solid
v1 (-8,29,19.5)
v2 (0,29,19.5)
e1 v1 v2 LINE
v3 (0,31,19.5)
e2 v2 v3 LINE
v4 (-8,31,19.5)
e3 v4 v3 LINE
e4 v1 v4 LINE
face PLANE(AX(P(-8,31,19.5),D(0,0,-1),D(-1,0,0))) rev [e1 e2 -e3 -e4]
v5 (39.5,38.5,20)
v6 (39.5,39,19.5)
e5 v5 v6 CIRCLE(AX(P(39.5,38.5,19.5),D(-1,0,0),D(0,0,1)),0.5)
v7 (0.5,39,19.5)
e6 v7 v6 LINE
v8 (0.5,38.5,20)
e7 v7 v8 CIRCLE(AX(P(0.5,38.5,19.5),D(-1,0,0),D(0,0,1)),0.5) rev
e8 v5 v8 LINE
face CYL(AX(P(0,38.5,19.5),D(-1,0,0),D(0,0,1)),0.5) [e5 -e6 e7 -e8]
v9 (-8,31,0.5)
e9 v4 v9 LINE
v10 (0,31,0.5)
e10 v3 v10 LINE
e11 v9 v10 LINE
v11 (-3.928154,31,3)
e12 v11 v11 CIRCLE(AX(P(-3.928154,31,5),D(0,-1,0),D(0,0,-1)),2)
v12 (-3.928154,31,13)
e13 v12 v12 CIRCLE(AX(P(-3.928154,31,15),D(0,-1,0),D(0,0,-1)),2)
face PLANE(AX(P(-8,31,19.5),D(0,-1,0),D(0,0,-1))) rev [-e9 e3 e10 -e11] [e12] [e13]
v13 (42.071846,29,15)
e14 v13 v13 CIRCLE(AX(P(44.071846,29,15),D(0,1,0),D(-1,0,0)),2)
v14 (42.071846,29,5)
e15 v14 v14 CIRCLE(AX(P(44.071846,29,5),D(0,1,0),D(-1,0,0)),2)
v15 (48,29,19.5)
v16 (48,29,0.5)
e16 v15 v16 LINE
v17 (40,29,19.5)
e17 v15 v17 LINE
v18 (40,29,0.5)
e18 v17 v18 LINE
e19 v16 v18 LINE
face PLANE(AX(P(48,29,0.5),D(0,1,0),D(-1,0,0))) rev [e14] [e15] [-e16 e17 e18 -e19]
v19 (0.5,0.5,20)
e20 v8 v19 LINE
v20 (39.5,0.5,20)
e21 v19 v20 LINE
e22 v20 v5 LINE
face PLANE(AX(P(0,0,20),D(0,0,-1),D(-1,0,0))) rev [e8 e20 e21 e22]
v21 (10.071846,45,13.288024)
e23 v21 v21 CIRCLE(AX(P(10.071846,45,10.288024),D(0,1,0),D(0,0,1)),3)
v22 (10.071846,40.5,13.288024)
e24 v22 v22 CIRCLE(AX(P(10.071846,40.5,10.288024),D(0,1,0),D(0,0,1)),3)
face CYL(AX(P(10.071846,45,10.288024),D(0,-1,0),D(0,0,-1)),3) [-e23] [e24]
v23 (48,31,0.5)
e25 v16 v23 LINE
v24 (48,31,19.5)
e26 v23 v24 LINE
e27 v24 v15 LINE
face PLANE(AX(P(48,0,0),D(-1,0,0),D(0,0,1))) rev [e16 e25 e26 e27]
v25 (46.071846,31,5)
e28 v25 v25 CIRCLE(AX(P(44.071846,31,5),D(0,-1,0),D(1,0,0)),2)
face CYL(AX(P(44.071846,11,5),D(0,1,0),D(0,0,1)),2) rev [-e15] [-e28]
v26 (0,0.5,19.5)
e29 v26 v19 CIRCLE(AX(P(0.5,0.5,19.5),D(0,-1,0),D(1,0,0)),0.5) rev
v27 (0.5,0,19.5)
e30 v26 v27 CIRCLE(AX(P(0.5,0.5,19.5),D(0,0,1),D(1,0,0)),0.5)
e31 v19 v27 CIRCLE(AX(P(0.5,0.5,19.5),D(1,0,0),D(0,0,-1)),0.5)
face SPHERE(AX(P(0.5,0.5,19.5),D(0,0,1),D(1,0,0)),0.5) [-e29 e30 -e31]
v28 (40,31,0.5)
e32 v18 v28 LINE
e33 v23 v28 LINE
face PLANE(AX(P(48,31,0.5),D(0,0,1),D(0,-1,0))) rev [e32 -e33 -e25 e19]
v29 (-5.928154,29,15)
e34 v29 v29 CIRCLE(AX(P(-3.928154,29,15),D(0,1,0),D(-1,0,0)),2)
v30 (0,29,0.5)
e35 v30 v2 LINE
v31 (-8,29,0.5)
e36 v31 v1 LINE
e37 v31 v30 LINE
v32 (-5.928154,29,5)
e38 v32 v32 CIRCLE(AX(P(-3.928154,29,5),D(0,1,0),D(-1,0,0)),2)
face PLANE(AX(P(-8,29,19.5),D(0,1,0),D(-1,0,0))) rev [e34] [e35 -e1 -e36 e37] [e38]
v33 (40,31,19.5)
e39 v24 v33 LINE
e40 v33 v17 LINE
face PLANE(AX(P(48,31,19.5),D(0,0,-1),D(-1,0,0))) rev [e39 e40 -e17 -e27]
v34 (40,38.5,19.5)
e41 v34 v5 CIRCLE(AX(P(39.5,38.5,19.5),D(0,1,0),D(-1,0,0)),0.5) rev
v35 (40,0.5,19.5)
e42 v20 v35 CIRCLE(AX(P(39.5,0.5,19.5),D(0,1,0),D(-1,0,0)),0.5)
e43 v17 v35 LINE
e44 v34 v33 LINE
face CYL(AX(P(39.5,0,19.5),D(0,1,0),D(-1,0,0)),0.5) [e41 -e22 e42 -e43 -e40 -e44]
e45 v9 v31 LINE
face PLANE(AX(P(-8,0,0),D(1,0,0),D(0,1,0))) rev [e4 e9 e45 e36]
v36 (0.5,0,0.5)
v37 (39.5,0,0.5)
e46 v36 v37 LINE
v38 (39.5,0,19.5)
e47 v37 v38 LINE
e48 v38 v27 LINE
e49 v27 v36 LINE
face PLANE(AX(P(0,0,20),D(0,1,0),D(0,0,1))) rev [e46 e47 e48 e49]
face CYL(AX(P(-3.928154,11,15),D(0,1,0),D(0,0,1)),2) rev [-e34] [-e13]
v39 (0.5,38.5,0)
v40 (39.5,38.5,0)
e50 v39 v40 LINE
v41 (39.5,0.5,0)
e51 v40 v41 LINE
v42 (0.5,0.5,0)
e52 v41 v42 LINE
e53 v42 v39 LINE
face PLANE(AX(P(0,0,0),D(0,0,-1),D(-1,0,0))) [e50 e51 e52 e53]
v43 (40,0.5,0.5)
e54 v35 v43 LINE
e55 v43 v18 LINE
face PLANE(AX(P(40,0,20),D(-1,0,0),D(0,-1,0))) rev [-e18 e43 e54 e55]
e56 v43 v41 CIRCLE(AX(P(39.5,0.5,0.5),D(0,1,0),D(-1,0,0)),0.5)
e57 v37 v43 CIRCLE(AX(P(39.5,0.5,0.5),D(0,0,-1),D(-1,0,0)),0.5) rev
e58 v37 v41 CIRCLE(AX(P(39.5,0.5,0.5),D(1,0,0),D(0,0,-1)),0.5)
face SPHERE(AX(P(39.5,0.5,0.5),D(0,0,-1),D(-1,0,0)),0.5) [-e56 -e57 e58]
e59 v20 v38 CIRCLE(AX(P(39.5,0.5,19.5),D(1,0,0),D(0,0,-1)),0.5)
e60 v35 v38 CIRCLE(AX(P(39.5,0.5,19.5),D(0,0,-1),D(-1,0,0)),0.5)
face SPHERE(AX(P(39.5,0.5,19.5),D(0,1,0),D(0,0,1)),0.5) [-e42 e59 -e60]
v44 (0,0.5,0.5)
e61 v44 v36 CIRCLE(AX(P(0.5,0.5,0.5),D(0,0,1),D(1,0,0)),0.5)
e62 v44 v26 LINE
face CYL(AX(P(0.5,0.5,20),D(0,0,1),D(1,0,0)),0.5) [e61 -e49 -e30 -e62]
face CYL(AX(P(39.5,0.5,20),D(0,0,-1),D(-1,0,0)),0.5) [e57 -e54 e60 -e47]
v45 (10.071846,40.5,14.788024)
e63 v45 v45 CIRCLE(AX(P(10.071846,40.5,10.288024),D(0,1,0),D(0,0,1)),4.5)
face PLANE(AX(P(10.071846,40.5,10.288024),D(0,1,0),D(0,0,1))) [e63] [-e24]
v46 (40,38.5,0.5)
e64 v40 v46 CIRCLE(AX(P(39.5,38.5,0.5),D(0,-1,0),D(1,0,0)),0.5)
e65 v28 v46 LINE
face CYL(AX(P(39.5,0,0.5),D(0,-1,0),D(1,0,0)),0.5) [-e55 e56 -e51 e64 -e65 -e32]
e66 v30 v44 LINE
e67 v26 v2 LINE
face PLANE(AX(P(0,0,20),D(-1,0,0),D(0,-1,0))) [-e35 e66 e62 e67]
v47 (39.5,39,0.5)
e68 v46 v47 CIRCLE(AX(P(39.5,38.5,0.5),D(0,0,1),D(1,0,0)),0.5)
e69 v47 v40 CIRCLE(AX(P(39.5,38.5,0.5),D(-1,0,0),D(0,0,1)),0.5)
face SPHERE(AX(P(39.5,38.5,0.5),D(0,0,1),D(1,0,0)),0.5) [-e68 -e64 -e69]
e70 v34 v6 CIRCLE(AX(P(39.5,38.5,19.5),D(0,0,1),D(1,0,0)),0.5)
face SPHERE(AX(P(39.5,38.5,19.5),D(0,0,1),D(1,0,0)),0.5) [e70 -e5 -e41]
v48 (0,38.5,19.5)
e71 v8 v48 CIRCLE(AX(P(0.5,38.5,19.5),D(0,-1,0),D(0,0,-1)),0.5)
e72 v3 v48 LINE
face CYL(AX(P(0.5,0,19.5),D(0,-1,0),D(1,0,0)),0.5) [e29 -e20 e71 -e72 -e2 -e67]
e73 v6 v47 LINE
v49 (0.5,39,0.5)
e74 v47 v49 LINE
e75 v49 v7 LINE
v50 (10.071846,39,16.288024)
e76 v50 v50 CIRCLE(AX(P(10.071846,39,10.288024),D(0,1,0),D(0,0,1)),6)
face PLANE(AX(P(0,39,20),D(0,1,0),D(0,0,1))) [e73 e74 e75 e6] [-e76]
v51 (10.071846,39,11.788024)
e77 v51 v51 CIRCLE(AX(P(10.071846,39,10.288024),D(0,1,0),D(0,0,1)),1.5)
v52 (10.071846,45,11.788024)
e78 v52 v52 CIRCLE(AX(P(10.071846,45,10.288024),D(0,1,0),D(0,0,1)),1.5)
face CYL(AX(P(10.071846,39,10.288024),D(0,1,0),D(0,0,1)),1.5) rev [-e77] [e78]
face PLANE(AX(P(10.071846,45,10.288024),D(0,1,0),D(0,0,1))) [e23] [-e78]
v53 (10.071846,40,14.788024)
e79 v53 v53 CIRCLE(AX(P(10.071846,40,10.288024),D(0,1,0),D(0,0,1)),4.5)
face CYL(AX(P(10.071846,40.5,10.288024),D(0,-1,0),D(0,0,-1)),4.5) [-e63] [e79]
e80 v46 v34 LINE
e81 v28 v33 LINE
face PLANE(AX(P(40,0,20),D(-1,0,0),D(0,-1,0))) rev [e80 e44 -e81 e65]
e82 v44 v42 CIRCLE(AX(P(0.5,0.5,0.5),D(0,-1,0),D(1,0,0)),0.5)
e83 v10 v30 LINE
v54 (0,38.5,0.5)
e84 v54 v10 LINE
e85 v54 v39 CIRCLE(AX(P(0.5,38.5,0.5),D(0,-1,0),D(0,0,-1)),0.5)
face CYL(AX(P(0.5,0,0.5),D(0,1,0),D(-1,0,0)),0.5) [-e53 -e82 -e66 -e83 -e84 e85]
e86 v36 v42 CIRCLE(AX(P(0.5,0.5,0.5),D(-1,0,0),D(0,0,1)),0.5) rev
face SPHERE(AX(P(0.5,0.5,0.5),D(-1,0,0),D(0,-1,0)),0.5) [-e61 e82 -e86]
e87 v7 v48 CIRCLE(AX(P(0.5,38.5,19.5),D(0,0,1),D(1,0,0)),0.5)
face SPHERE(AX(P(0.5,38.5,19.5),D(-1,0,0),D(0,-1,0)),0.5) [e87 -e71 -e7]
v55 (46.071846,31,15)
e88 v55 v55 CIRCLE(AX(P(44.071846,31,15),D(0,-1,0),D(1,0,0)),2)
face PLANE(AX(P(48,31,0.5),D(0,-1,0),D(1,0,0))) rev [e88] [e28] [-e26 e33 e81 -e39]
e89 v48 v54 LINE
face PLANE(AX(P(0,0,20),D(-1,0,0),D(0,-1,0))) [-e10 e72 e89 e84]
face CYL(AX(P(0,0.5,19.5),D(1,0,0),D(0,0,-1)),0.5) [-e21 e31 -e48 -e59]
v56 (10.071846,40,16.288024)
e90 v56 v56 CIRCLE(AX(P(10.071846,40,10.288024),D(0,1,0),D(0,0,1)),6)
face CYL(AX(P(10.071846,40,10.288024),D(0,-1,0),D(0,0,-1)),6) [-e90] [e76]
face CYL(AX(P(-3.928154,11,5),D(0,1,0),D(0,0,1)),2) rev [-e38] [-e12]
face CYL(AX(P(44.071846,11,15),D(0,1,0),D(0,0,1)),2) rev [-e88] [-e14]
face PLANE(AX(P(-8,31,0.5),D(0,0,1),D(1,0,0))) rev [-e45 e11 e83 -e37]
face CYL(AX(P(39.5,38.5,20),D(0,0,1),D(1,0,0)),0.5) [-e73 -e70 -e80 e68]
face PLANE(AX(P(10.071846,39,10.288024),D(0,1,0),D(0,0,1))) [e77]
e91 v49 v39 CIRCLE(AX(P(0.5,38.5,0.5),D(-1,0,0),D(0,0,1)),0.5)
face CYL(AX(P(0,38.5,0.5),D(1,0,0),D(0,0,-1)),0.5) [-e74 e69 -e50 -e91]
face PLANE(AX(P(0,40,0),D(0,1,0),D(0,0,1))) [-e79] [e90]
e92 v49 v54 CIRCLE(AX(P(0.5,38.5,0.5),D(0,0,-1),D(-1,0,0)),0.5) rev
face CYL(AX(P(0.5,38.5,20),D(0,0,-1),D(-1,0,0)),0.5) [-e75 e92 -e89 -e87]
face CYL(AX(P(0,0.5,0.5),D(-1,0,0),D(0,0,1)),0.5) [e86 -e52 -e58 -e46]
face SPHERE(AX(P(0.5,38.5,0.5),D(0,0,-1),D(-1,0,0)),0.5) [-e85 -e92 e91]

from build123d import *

# Parameters (mm, degrees)
SKETCH_1_W          = 40
SKETCH_1_H          = 39
EXTRUDE_2_DEPTH     = 20
FILLET_2_R          = 0.5
FILLET_3_R          = 0.5
FILLET_4_R          = 0.5
FILLET_5_R          = 0.5
SKETCH_6_W          = 19
SKETCH_6_H          = 2
EXTRUDE_3_DEPTH     = 8
SKETCH_7_W          = 19
SKETCH_7_H          = 2
EXTRUDE_5_DEPTH     = 8
SKETCH_8_R          = 2
CUT_EXTRUDE_1_DEPTH = 28
SKETCH_9_R          = 6
SKETCH_9_R_2        = 4.5
EXTRUDE_7_DEPTH     = 1
SKETCH_10_R         = 4.5
EXTRUDE_8_DEPTH     = 1.5
SKETCH_11_R         = 3
EXTRUDE_9_DEPTH     = 4.5
SKETCH_12_R         = 1.5
CUT_EXTRUDE_2_DEPTH = 6


with BuildPart() as part:
    # 草图1 → 凸台-拉伸2 (new body)
    with BuildSketch(Plane.XY):
        with Locations((20, 19.5)):
            Rectangle(SKETCH_1_W, SKETCH_1_H)
    extrude(amount=EXTRUDE_2_DEPTH)

    # 圆角2
    fillet_2_edges = [part.edges().sort_by_distance(p)[0] for p in [
        (40, 19.5, 20),
        (20, 39, 20),
    ]]
    fillet(fillet_2_edges, radius=FILLET_2_R)

    # 圆角3
    fillet_3_edges = [part.edges().sort_by_distance(p)[0] for p in [
        (40, 0, 9.75),
        (19.75, 0, 20),
        (39.853553391, 0, 19.853553391),
        (0, 39, 9.75),
        (0, 38.853553391, 19.853553391),
        (0, 19.25, 20),
    ]]
    fillet(fillet_3_edges, radius=FILLET_3_R)

    # 圆角4
    # the kernel refuses this fillet: 0.5 mm, written as the material it takes off along each edge
    with BuildSketch(Plane(origin=(39.5, 38.5, 19.5), x_dir=(0, 1, 0), z_dir=(1, 0, 0))) as fillet_4_piece_1_section:
        Polygon((0, 0), (FILLET_4_R, 0), (FILLET_4_R, FILLET_4_R), (0, FILLET_4_R), align=None)
    fillet_4_piece_1 = extrude(amount=FILLET_4_R, mode=Mode.PRIVATE)
    fillet_4_piece_1 = fillet_4_piece_1 - Plane(origin=(39.5, 38.5, 19.5), x_dir=(0, -0.7071067811865475, -0.7071067811865475), z_dir=(1, 0, 0)) * Sphere(FILLET_4_R, mode=Mode.PRIVATE)
    add(fillet_4_piece_1, mode=Mode.SUBTRACT)
    with BuildSketch(Plane(origin=(40, 39, -1.25), x_dir=(0, -1, 0), z_dir=(0, 0, 1))) as fillet_4_piece_2:
        with BuildLine():
            CenterArc((FILLET_4_R, -FILLET_4_R), FILLET_4_R, 90, 90)
            Line((0, -FILLET_4_R), (0, 0))
            Line((0, 0), (FILLET_4_R, 0))
        make_face()
    extrude(amount=20.75, mode=Mode.SUBTRACT)
    with BuildSketch(Plane(origin=(40, 0.5, 0), x_dir=(-1, 0, 0), z_dir=(0, 1, 0))) as fillet_4_piece_3:
        with BuildLine():
            CenterArc((FILLET_4_R, FILLET_4_R), FILLET_4_R, 180, 90)
            Line((0, FILLET_4_R), (0, 0))
            Line((0, 0), (FILLET_4_R, 0))
        make_face()
    extrude(amount=39.75, mode=Mode.SUBTRACT)
    with BuildSketch(Plane(origin=(39.5, 0.5, 0), x_dir=(0, -1, 0), z_dir=(-1, 0, 0))) as fillet_4_piece_4:
        with BuildLine():
            CenterArc((0.5 - FILLET_4_R, FILLET_4_R), FILLET_4_R, 270, 90)
            Line((0.5, FILLET_4_R), (0.5, 0))
            Line((0.5, 0), (0.5 - FILLET_4_R, 0))
        make_face()
    revolve(axis=Axis((39.5, 0.5, 0), (0, 0, 1)), revolution_arc=90, mode=Mode.SUBTRACT)
    with BuildSketch(Plane(origin=(-1.25, 0, 0), x_dir=(0, 0, 1), z_dir=(1, 0, 0))) as fillet_4_piece_5:
        with BuildLine():
            CenterArc((FILLET_4_R, -FILLET_4_R), FILLET_4_R, 90, 90)
            Line((0, -FILLET_4_R), (0, 0))
            Line((0, 0), (FILLET_4_R, 0))
        make_face()
    extrude(amount=40.75, mode=Mode.SUBTRACT)

    # 圆角5
    # the kernel refuses this fillet: 0.5 mm, written as the material it takes off along each edge
    with BuildSketch(Plane(origin=(0.5, 0.5, 19.5), x_dir=(-1, 0, 0), z_dir=(0, -1, 0))) as fillet_5_piece_1_section:
        Polygon((0, 0), (FILLET_5_R, 0), (FILLET_5_R, -FILLET_5_R), (0, -FILLET_5_R), align=None)
    fillet_5_piece_1 = extrude(amount=FILLET_5_R, mode=Mode.PRIVATE)
    fillet_5_piece_1 = fillet_5_piece_1 - Plane(origin=(0.5, 0.5, 19.5), x_dir=(0.7071067811865475, 0, -0.7071067811865475), z_dir=(0, -1, 0)) * Sphere(FILLET_5_R, mode=Mode.PRIVATE)
    add(fillet_5_piece_1, mode=Mode.SUBTRACT)
    with BuildSketch(Plane(origin=(39.5, 38.5, 0.5), x_dir=(0, 1, 0), z_dir=(0, 0, -1))) as fillet_5_piece_2_section:
        Polygon((0, 0), (FILLET_5_R, 0), (FILLET_5_R, FILLET_5_R), (0, FILLET_5_R), align=None)
    fillet_5_piece_2 = extrude(amount=FILLET_5_R, mode=Mode.PRIVATE)
    fillet_5_piece_2 = fillet_5_piece_2 - Plane(origin=(39.5, 38.5, 0.5), x_dir=(-0.7071067811865475, -0.7071067811865477, 0), z_dir=(0, 0, -1)) * Sphere(FILLET_5_R, mode=Mode.PRIVATE)
    add(fillet_5_piece_2, mode=Mode.SUBTRACT)
    with BuildSketch(Plane(origin=(39.5, 39, 0), x_dir=(0, -1, 0), z_dir=(-1, 0, 0))) as fillet_5_piece_3:
        with BuildLine():
            CenterArc((FILLET_5_R, FILLET_5_R), FILLET_5_R, 180, 90)
            Line((0, FILLET_5_R), (0, 0))
            Line((0, 0), (FILLET_5_R, 0))
        make_face()
    extrude(amount=39, mode=Mode.SUBTRACT)
    with BuildSketch(Plane(origin=(0.5, 38.5, 0), x_dir=(-1, 0, 0), z_dir=(0, -1, 0))) as fillet_5_piece_4:
        with BuildLine():
            CenterArc((0.5 - FILLET_5_R, -FILLET_5_R), FILLET_5_R, 0, 90)
            Line((0.5, -FILLET_5_R), (0.5, 0))
            Line((0.5, 0), (0.5 - FILLET_5_R, 0))
        make_face()
    revolve(axis=Axis((0.5, 38.5, 0), (0, 0, -1)), revolution_arc=90, mode=Mode.SUBTRACT)
    with BuildSketch(Plane(origin=(0, 0, 0.5), x_dir=(1, 0, 0), z_dir=(0, 0, 1))) as fillet_5_piece_5:
        with BuildLine():
            CenterArc((FILLET_5_R, FILLET_5_R), FILLET_5_R, 180, 90)
            Line((0, FILLET_5_R), (0, 0))
            Line((0, 0), (FILLET_5_R, 0))
        make_face()
    extrude(amount=19, mode=Mode.SUBTRACT)
    with BuildSketch(Plane(origin=(0, 38.5, 0), x_dir=(0, 0, 1), z_dir=(0, -1, 0))) as fillet_5_piece_6:
        with BuildLine():
            CenterArc((FILLET_5_R, -FILLET_5_R), FILLET_5_R, 90, 90)
            Line((0, -FILLET_5_R), (0, 0))
            Line((0, 0), (FILLET_5_R, 0))
        make_face()
    extrude(amount=38, mode=Mode.SUBTRACT)
    with BuildSketch(Plane(origin=(0, 0.5, 0.5), x_dir=(0, 0, -1), z_dir=(0, 1, 0))) as fillet_5_piece_7:
        with BuildLine():
            CenterArc((0.5 - FILLET_5_R, -FILLET_5_R), FILLET_5_R, 0, 90)
            Line((0.5 - FILLET_5_R, 0), (0.5, 0))
            Line((0.5, 0), (0.5, -FILLET_5_R))
        make_face()
    revolve(axis=Axis((0, 0.5, 0.5), (-1, 0, 0)), revolution_arc=90, mode=Mode.SUBTRACT)

    # 草图6 → 凸台-拉伸3 (add)
    with BuildSketch(Plane.ZY):
        with Locations((10, 30)):
            Rectangle(SKETCH_6_W, SKETCH_6_H)
    extrude(amount=EXTRUDE_3_DEPTH)

    # 草图7 → 凸台-拉伸5 (add)
    with BuildSketch(Plane(origin=(40, 0, 0), x_dir=(0, 0, -1), z_dir=(1, 0, 0))):
        with Locations((-10, 30)):
            Rectangle(SKETCH_7_W, SKETCH_7_H)
    extrude(amount=EXTRUDE_5_DEPTH)

    # 草图8 → 切除-拉伸1 (cut)
    with BuildSketch(Plane(origin=(0, 39, 0), x_dir=(1, 0, 0), z_dir=(0, 1, 0))):
        with Locations(Location((-3.928154272, -5, 0), (0, 0, 180))):
            Circle(SKETCH_8_R)
        with Locations(Location((-3.928154272, -15, 0), (0, 0, 180))):
            Circle(SKETCH_8_R)
        with Locations(Location((44.071845728, -5, 0), (0, 0, 180))):
            Circle(SKETCH_8_R)
        with Locations(Location((44.071845728, -15, 0), (0, 0, 180))):
            Circle(SKETCH_8_R)
    extrude(amount=-CUT_EXTRUDE_1_DEPTH, mode=Mode.SUBTRACT)

    # 草图9 → 凸台-拉伸7 (add)
    with BuildSketch(Plane(origin=(0, 39, 0), x_dir=(1, 0, 0), z_dir=(0, 1, 0))):
        with Locations(Location((10.071845728, -10.288024079, 0), (0, 0, 270))):
            Circle(SKETCH_9_R)
        with Locations(Location((10.071845728, -10.288024079, 0), (0, 0, 270))):
            Circle(SKETCH_9_R_2, mode=Mode.SUBTRACT)
    extrude(amount=EXTRUDE_7_DEPTH)

    # 草图10 → 凸台-拉伸8 (add)
    with BuildSketch(Plane(origin=(0, 39, 0), x_dir=(1, 0, 0), z_dir=(0, 1, 0))):
        with Locations(Location((10.071845728, -10.288024079, 0), (0, 0, 270))):
            Circle(SKETCH_10_R)
    extrude(amount=EXTRUDE_8_DEPTH)

    # 草图11 → 凸台-拉伸9 (add)
    with BuildSketch(Plane(origin=(0, 40.5, 0), x_dir=(1, 0, 0), z_dir=(0, 1, 0))):
        with Locations(Location((10.071845728, -10.288024079, 0), (0, 0, 270))):
            Circle(SKETCH_11_R)
    extrude(amount=EXTRUDE_9_DEPTH)

    # 草图12 → 切除-拉伸2 (cut)
    with BuildSketch(Plane(origin=(0, 45, 0), x_dir=(1, 0, 0), z_dir=(0, 1, 0))):
        with Locations(Location((10.071845728, -10.288024079, 0), (0, 0, 270))):
            Circle(SKETCH_12_R)
    extrude(amount=-CUT_EXTRUDE_2_DEPTH, mode=Mode.SUBTRACT)


solid = part.part
